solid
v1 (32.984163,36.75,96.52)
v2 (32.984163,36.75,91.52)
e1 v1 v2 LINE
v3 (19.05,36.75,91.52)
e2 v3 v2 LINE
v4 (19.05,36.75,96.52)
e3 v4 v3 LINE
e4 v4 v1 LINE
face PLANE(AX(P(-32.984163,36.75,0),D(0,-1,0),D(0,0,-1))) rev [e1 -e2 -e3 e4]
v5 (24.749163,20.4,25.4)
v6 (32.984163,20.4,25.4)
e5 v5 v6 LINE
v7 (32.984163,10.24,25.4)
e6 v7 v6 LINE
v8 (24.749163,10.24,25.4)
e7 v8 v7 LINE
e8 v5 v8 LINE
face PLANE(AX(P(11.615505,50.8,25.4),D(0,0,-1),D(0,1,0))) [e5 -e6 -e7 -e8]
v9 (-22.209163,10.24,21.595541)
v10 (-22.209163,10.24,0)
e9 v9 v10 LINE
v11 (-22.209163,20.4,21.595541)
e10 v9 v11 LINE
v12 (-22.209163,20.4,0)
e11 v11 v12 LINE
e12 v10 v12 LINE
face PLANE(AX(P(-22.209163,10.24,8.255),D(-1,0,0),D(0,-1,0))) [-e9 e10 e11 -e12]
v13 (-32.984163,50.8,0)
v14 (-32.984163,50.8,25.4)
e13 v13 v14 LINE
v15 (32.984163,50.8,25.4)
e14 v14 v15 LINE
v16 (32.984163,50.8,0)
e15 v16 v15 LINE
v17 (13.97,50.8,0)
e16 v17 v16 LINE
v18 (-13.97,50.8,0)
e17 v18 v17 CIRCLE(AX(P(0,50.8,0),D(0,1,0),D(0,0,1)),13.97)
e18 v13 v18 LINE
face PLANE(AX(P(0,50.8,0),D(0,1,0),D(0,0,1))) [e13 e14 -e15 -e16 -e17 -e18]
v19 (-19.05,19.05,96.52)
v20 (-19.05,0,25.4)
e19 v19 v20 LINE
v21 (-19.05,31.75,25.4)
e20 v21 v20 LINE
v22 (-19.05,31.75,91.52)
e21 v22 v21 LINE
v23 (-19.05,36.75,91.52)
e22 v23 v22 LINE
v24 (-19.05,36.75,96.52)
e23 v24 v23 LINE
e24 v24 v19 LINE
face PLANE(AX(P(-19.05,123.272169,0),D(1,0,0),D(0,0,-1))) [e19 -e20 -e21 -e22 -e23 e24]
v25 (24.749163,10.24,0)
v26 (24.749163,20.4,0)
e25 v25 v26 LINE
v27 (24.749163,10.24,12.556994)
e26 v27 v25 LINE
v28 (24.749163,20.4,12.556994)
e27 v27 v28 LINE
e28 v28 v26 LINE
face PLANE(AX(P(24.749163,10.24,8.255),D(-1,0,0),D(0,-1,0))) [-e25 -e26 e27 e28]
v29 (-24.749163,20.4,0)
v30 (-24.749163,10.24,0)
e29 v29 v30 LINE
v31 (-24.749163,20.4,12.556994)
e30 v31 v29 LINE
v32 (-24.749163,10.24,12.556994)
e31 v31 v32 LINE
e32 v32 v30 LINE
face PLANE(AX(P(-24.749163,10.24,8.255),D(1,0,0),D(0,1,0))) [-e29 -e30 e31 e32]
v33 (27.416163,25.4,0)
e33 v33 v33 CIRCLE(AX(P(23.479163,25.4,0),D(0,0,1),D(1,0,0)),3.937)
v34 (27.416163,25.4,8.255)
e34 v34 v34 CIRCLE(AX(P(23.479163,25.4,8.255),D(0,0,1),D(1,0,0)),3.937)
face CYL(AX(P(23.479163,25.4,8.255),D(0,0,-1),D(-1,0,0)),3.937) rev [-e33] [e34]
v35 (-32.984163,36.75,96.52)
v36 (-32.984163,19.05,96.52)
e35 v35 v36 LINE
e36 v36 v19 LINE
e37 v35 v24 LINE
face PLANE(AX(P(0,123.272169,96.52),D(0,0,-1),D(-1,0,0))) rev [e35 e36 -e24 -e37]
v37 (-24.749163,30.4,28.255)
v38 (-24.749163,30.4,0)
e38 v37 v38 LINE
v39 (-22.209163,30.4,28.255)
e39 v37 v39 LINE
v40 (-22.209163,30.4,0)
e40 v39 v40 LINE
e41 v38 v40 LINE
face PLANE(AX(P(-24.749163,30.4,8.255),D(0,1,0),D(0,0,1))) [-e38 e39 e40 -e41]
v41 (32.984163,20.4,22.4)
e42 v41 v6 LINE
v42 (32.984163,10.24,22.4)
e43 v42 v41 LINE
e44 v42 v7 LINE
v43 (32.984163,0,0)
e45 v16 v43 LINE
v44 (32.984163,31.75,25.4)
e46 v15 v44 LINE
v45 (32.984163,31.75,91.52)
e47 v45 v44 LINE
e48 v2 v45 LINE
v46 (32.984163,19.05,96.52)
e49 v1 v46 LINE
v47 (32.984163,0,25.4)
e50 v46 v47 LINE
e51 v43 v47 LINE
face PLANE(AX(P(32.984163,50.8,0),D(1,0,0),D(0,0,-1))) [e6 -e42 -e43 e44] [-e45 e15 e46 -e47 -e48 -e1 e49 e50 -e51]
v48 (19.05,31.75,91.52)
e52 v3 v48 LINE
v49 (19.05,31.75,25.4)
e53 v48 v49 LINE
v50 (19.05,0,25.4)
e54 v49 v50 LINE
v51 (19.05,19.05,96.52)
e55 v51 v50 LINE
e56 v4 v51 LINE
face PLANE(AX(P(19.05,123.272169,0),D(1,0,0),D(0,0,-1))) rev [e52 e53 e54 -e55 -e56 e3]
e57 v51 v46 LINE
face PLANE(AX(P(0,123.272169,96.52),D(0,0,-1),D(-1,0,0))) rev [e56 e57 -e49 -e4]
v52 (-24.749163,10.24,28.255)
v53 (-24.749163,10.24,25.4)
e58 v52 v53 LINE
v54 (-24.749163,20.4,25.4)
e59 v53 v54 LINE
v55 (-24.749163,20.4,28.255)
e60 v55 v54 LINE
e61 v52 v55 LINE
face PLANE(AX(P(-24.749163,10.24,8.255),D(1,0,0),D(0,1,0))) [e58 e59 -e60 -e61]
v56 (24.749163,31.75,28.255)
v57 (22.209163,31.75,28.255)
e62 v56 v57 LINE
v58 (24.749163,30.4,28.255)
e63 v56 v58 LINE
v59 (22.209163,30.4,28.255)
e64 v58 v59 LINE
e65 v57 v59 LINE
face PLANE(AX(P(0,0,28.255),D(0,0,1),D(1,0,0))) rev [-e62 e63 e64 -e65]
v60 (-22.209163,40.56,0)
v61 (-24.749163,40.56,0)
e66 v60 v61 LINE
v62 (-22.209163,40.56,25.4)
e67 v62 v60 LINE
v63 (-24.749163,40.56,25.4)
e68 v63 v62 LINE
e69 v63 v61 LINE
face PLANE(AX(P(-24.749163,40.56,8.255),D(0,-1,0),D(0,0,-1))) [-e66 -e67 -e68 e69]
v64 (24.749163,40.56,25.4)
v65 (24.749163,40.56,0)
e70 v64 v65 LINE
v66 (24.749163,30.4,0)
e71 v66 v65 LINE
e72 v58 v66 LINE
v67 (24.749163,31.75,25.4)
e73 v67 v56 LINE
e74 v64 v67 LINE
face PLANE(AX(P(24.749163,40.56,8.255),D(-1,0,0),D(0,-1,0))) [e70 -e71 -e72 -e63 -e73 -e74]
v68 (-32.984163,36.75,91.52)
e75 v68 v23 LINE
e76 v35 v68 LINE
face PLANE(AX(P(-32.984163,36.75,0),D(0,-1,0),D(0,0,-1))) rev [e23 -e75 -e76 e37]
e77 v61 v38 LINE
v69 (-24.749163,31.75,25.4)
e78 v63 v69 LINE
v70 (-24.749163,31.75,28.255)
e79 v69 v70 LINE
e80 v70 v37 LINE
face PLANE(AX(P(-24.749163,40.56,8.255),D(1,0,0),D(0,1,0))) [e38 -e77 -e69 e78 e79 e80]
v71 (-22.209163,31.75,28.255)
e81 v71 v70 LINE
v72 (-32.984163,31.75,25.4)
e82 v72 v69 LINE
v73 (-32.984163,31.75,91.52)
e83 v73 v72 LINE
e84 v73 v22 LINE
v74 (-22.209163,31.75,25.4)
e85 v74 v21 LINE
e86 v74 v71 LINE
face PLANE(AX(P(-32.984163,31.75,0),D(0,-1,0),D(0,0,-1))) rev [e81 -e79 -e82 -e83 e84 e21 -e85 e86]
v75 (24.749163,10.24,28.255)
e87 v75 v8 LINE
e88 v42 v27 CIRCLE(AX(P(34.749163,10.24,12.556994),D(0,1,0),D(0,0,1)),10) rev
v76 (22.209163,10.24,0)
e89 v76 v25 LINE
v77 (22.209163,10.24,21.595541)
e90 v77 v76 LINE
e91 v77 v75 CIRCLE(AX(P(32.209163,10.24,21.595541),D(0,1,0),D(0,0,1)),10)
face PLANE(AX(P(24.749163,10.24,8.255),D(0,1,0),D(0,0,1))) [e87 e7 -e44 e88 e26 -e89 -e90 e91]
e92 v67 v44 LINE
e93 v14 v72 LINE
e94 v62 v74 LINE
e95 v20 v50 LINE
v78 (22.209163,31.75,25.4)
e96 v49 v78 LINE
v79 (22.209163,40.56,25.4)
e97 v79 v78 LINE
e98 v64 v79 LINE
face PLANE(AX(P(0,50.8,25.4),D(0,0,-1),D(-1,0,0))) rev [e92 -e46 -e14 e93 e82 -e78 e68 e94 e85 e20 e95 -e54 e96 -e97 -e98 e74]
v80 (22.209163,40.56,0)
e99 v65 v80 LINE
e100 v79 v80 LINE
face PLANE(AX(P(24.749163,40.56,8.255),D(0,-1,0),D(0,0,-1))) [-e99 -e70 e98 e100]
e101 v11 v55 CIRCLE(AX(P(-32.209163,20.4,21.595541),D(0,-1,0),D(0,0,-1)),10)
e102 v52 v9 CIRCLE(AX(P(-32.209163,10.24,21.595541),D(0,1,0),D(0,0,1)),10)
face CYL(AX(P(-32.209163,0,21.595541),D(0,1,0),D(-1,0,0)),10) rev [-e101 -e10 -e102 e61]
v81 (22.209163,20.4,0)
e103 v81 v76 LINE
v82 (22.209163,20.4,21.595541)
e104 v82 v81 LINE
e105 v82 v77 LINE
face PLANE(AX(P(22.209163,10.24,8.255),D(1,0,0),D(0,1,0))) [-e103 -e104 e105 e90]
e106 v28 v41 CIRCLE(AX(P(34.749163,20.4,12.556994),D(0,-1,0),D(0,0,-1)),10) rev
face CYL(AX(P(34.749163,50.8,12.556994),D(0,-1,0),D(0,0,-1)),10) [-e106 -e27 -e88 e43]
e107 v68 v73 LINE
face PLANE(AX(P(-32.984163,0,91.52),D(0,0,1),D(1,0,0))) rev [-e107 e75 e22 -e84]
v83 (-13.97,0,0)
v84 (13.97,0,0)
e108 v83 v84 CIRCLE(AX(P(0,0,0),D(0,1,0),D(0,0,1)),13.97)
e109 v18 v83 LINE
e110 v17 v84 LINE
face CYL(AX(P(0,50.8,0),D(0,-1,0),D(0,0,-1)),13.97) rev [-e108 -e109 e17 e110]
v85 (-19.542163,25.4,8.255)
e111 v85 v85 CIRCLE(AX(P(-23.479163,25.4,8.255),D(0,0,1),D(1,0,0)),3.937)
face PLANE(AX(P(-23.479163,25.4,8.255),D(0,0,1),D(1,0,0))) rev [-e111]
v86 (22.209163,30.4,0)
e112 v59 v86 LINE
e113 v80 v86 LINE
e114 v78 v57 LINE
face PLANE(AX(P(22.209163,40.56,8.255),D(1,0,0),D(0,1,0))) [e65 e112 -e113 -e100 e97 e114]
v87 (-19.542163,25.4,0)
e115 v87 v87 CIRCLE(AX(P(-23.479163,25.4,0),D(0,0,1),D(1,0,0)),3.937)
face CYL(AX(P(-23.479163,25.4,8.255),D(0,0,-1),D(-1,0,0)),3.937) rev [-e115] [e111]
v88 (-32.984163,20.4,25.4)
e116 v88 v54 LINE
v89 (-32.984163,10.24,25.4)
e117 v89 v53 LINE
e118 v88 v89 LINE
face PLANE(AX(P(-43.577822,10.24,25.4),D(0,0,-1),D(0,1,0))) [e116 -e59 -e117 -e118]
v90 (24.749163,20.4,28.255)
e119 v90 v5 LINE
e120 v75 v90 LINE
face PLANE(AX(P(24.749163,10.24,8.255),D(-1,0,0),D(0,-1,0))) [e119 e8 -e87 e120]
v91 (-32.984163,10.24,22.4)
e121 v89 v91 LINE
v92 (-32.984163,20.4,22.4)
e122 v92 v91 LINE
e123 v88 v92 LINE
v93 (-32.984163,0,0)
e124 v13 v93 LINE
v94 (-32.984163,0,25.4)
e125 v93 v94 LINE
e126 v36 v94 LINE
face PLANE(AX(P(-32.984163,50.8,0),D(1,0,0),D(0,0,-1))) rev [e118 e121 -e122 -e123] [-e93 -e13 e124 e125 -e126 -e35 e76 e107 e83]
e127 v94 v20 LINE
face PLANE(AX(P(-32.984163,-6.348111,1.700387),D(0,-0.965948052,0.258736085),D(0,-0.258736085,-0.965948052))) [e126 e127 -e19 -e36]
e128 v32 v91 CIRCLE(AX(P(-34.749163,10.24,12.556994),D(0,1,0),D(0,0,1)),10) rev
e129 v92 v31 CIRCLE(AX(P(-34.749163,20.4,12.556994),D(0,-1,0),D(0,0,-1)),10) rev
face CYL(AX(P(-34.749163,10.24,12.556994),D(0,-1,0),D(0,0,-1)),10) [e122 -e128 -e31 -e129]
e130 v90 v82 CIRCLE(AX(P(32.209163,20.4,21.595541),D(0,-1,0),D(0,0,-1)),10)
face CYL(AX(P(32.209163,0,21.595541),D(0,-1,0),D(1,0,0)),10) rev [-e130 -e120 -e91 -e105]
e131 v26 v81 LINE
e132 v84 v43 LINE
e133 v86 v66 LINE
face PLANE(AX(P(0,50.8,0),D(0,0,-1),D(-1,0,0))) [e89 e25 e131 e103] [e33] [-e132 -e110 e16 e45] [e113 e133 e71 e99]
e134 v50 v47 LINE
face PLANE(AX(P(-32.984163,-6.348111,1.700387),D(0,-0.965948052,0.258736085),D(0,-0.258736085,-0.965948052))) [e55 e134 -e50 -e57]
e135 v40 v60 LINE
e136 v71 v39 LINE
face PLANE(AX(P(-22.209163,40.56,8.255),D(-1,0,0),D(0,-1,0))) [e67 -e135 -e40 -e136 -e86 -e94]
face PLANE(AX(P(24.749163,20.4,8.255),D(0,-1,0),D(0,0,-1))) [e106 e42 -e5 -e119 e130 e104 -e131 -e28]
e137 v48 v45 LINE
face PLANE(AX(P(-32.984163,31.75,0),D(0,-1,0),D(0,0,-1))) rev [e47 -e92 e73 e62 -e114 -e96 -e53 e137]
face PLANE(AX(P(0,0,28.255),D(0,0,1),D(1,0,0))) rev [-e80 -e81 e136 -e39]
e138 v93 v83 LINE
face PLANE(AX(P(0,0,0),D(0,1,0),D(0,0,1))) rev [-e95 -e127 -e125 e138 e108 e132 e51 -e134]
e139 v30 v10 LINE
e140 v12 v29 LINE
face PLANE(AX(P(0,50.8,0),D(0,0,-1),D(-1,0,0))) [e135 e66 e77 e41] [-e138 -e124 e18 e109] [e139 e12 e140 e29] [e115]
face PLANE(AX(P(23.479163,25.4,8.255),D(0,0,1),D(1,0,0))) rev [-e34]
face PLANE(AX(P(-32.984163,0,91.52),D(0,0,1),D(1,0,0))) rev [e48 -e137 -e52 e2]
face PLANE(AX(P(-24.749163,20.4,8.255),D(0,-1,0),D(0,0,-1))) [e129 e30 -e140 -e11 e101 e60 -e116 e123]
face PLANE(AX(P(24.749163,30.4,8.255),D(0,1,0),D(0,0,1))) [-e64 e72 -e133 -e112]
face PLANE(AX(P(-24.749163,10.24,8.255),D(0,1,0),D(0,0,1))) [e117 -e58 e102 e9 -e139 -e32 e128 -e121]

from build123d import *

# Parameters (mm, degrees)
BOSS_EXTRUDE1_DEPTH = 50.8
SKETCH1_4_W         = 13.934163053
SKETCH1_4_H         = 71.12
BOSS_EXTRUDE2_DEPTH = 50.8
CUT_EXTRUDE1_START  = -32.984163053
CUT_EXTRUDE1_DEPTH  = 65.968326106
SKETCH3_R           = 3.937
SKETCH3_W           = 2.54
SKETCH3_H           = 10.16
CUT_EXTRUDE2_DEPTH  = 8.255
SKETCH3_2_W         = 2.54
SKETCH3_2_H         = 10.16
CUT_EXTRUDE3_DEPTH  = 28.255
CUT_EXTRUDE4_START  = 32.984163
CUT_EXTRUDE4_DEPTH  = 10.775
CUT_EXTRUDE5_START  = -22.209163
CUT_EXTRUDE5_DEPTH  = 10.775
FILLET1_R           = 10


# Read off the part's stored shape, not the designer's step: Cut-Extrude1
with BuildPart() as part:
    # Sketch1 → Boss-Extrude1 (new body)
    with BuildSketch(Plane(origin=(0, 0, 0), x_dir=(1, 0, 0), z_dir=(0, 1, 0))):
        with BuildLine():
            ThreePointArc((13.97, 0), (0, -13.97), (-13.97, 0))
            Line((-13.97, 0), (-32.984163053, 0))
            Line((-32.984163053, 0), (-32.984163053, -25.4))
            Line((-32.984163053, -25.4), (-19.05, -25.4))
            Line((-19.05, -25.4), (19.05, -25.4))
            Line((19.05, -25.4), (32.984163053, -25.4))
            Line((32.984163053, -25.4), (32.984163053, 0))
            Line((32.984163053, 0), (13.97, 0))
        make_face()
    extrude(amount=BOSS_EXTRUDE1_DEPTH)

    # Sketch1<4> → Boss-Extrude2 (add)
    with BuildSketch(Plane(origin=(0, 0, 0), x_dir=(1, 0, 0), z_dir=(0, 1, 0))):
        with Locations((-26.017081527, -60.96)):
            Rectangle(SKETCH1_4_W, SKETCH1_4_H)
        with Locations((26.017081527, -60.96)):
            Rectangle(SKETCH1_4_W, SKETCH1_4_H)
    extrude(amount=BOSS_EXTRUDE2_DEPTH)

    # Cut-Extrude1 outline → Cut-Extrude1 (cut)
    with BuildSketch(Plane(origin=(0, 0, 0), x_dir=(0, 0, -1), z_dir=(1, 0, 0)).offset(CUT_EXTRUDE1_START)):
        Polygon((-96.52, 0), (-25.4, 0), (-96.52, 19.05), align=None)
        Polygon((-91.52, 31.75), (-25.4, 31.75), (-25.4, 50.8), (-96.52, 50.8), (-96.52, 36.75), (-91.52, 36.75), align=None)
    extrude(amount=CUT_EXTRUDE1_DEPTH, mode=Mode.SUBTRACT)

    # Sketch3 → Cut-Extrude2 (cut)
    with BuildSketch(Plane.XY):
        with Locations((23.479163053, 25.4)):
            Circle(SKETCH3_R)
        with Locations((-23.479163053, 25.4)):
            Circle(SKETCH3_R)
        with Locations((23.479163053, 35.48)):
            Rectangle(SKETCH3_W, SKETCH3_H)
        with Locations((-23.479163053, 35.48)):
            Rectangle(SKETCH3_W, SKETCH3_H)
        with Locations((-23.479163053, 15.32)):
            Rectangle(SKETCH3_W, SKETCH3_H)
        with Locations((23.479163053, 15.32)):
            Rectangle(SKETCH3_W, SKETCH3_H)
    extrude(amount=CUT_EXTRUDE2_DEPTH, mode=Mode.SUBTRACT)

    # Sketch3<2> → Cut-Extrude3 (cut)
    with BuildSketch(Plane.XY):
        with Locations((23.479163053, 35.48)):
            Rectangle(SKETCH3_2_W, SKETCH3_2_H)
        with Locations((-23.479163053, 35.48)):
            Rectangle(SKETCH3_2_W, SKETCH3_2_H)
        with Locations((23.479163053, 15.32)):
            Rectangle(SKETCH3_2_W, SKETCH3_2_H)
        with Locations((-23.479163053, 15.32)):
            Rectangle(SKETCH3_2_W, SKETCH3_2_H)
    extrude(amount=CUT_EXTRUDE3_DEPTH, mode=Mode.SUBTRACT)

    # Sketch2<4> → Cut-Extrude4 (cut)
    with BuildSketch(Plane(origin=(0, 0, 0), x_dir=(0, 0, -1), z_dir=(1, 0, 0)).offset(CUT_EXTRUDE4_START)):
        Polygon((-22.4, 20.4), (-25.4, 20.4), (-25.4, 19.05), (-25.4, 10.24), (-22.4, 10.24), align=None)
    extrude(amount=-CUT_EXTRUDE4_DEPTH, mode=Mode.SUBTRACT)

    # Sketch2<5> → Cut-Extrude5 (cut)
    with BuildSketch(Plane(origin=(0, 0, 0), x_dir=(0, 0, -1), z_dir=(1, 0, 0)).offset(CUT_EXTRUDE5_START)):
        Polygon((-22.4, 20.4), (-25.4, 20.4), (-25.4, 19.05), (-25.4, 10.24), (-22.4, 10.24), align=None)
    extrude(amount=-CUT_EXTRUDE5_DEPTH, mode=Mode.SUBTRACT)

    # Fillet1
    # the kernel refuses this fillet: 10 mm, written as the material it adds along each edge
    with BuildSketch(Plane(origin=(22.209163053, 10.24, 28.255), x_dir=(0, 0, -1), z_dir=(0, 1, 0)), Plane(origin=(-22.209163053, 20.4, 28.255), x_dir=(0, 0, -1), z_dir=(0, -1, 0))) as fillet1_piece_1:
        with BuildLine():
            CenterArc((6.659459438, -10), FILLET1_R, 90, 41.754936598)
            Line((0, -2.54), (0, 0))
            Line((0, 0), (6.659459438, 0))
        make_face()
    extrude(amount=10.16)
    # the kernel refuses this fillet: 10 mm, written as the material it takes off along each edge
    with BuildSketch(Plane(origin=(-24.749163053, 20.4, 22.4), x_dir=(0, 0, -1), z_dir=(0, -1, 0))) as fillet1_2_piece_1:
        with BuildLine():
            CenterArc((9.843006391, -10), FILLET1_R, 90, 79.834039024)
            Line((0, -8.234999947), (0, 0))
            Line((0, 0), (9.843006391, 0))
        make_face()
    extrude(amount=10.16, mode=Mode.SUBTRACT)
    with BuildSketch(Plane(origin=(24.749163053, 20.4, 22.4), x_dir=(0, 0, -1), z_dir=(0, -1, 0))) as fillet1_2_piece_2:
        with BuildLine():
            CenterArc((9.843006391, 10), FILLET1_R, 190.165960976, 79.834039024)
            Line((0, 8.234999947), (0, 0))
            Line((0, 0), (9.843006391, 0))
        make_face()
    extrude(amount=10.16, mode=Mode.SUBTRACT)


solid = part.part
